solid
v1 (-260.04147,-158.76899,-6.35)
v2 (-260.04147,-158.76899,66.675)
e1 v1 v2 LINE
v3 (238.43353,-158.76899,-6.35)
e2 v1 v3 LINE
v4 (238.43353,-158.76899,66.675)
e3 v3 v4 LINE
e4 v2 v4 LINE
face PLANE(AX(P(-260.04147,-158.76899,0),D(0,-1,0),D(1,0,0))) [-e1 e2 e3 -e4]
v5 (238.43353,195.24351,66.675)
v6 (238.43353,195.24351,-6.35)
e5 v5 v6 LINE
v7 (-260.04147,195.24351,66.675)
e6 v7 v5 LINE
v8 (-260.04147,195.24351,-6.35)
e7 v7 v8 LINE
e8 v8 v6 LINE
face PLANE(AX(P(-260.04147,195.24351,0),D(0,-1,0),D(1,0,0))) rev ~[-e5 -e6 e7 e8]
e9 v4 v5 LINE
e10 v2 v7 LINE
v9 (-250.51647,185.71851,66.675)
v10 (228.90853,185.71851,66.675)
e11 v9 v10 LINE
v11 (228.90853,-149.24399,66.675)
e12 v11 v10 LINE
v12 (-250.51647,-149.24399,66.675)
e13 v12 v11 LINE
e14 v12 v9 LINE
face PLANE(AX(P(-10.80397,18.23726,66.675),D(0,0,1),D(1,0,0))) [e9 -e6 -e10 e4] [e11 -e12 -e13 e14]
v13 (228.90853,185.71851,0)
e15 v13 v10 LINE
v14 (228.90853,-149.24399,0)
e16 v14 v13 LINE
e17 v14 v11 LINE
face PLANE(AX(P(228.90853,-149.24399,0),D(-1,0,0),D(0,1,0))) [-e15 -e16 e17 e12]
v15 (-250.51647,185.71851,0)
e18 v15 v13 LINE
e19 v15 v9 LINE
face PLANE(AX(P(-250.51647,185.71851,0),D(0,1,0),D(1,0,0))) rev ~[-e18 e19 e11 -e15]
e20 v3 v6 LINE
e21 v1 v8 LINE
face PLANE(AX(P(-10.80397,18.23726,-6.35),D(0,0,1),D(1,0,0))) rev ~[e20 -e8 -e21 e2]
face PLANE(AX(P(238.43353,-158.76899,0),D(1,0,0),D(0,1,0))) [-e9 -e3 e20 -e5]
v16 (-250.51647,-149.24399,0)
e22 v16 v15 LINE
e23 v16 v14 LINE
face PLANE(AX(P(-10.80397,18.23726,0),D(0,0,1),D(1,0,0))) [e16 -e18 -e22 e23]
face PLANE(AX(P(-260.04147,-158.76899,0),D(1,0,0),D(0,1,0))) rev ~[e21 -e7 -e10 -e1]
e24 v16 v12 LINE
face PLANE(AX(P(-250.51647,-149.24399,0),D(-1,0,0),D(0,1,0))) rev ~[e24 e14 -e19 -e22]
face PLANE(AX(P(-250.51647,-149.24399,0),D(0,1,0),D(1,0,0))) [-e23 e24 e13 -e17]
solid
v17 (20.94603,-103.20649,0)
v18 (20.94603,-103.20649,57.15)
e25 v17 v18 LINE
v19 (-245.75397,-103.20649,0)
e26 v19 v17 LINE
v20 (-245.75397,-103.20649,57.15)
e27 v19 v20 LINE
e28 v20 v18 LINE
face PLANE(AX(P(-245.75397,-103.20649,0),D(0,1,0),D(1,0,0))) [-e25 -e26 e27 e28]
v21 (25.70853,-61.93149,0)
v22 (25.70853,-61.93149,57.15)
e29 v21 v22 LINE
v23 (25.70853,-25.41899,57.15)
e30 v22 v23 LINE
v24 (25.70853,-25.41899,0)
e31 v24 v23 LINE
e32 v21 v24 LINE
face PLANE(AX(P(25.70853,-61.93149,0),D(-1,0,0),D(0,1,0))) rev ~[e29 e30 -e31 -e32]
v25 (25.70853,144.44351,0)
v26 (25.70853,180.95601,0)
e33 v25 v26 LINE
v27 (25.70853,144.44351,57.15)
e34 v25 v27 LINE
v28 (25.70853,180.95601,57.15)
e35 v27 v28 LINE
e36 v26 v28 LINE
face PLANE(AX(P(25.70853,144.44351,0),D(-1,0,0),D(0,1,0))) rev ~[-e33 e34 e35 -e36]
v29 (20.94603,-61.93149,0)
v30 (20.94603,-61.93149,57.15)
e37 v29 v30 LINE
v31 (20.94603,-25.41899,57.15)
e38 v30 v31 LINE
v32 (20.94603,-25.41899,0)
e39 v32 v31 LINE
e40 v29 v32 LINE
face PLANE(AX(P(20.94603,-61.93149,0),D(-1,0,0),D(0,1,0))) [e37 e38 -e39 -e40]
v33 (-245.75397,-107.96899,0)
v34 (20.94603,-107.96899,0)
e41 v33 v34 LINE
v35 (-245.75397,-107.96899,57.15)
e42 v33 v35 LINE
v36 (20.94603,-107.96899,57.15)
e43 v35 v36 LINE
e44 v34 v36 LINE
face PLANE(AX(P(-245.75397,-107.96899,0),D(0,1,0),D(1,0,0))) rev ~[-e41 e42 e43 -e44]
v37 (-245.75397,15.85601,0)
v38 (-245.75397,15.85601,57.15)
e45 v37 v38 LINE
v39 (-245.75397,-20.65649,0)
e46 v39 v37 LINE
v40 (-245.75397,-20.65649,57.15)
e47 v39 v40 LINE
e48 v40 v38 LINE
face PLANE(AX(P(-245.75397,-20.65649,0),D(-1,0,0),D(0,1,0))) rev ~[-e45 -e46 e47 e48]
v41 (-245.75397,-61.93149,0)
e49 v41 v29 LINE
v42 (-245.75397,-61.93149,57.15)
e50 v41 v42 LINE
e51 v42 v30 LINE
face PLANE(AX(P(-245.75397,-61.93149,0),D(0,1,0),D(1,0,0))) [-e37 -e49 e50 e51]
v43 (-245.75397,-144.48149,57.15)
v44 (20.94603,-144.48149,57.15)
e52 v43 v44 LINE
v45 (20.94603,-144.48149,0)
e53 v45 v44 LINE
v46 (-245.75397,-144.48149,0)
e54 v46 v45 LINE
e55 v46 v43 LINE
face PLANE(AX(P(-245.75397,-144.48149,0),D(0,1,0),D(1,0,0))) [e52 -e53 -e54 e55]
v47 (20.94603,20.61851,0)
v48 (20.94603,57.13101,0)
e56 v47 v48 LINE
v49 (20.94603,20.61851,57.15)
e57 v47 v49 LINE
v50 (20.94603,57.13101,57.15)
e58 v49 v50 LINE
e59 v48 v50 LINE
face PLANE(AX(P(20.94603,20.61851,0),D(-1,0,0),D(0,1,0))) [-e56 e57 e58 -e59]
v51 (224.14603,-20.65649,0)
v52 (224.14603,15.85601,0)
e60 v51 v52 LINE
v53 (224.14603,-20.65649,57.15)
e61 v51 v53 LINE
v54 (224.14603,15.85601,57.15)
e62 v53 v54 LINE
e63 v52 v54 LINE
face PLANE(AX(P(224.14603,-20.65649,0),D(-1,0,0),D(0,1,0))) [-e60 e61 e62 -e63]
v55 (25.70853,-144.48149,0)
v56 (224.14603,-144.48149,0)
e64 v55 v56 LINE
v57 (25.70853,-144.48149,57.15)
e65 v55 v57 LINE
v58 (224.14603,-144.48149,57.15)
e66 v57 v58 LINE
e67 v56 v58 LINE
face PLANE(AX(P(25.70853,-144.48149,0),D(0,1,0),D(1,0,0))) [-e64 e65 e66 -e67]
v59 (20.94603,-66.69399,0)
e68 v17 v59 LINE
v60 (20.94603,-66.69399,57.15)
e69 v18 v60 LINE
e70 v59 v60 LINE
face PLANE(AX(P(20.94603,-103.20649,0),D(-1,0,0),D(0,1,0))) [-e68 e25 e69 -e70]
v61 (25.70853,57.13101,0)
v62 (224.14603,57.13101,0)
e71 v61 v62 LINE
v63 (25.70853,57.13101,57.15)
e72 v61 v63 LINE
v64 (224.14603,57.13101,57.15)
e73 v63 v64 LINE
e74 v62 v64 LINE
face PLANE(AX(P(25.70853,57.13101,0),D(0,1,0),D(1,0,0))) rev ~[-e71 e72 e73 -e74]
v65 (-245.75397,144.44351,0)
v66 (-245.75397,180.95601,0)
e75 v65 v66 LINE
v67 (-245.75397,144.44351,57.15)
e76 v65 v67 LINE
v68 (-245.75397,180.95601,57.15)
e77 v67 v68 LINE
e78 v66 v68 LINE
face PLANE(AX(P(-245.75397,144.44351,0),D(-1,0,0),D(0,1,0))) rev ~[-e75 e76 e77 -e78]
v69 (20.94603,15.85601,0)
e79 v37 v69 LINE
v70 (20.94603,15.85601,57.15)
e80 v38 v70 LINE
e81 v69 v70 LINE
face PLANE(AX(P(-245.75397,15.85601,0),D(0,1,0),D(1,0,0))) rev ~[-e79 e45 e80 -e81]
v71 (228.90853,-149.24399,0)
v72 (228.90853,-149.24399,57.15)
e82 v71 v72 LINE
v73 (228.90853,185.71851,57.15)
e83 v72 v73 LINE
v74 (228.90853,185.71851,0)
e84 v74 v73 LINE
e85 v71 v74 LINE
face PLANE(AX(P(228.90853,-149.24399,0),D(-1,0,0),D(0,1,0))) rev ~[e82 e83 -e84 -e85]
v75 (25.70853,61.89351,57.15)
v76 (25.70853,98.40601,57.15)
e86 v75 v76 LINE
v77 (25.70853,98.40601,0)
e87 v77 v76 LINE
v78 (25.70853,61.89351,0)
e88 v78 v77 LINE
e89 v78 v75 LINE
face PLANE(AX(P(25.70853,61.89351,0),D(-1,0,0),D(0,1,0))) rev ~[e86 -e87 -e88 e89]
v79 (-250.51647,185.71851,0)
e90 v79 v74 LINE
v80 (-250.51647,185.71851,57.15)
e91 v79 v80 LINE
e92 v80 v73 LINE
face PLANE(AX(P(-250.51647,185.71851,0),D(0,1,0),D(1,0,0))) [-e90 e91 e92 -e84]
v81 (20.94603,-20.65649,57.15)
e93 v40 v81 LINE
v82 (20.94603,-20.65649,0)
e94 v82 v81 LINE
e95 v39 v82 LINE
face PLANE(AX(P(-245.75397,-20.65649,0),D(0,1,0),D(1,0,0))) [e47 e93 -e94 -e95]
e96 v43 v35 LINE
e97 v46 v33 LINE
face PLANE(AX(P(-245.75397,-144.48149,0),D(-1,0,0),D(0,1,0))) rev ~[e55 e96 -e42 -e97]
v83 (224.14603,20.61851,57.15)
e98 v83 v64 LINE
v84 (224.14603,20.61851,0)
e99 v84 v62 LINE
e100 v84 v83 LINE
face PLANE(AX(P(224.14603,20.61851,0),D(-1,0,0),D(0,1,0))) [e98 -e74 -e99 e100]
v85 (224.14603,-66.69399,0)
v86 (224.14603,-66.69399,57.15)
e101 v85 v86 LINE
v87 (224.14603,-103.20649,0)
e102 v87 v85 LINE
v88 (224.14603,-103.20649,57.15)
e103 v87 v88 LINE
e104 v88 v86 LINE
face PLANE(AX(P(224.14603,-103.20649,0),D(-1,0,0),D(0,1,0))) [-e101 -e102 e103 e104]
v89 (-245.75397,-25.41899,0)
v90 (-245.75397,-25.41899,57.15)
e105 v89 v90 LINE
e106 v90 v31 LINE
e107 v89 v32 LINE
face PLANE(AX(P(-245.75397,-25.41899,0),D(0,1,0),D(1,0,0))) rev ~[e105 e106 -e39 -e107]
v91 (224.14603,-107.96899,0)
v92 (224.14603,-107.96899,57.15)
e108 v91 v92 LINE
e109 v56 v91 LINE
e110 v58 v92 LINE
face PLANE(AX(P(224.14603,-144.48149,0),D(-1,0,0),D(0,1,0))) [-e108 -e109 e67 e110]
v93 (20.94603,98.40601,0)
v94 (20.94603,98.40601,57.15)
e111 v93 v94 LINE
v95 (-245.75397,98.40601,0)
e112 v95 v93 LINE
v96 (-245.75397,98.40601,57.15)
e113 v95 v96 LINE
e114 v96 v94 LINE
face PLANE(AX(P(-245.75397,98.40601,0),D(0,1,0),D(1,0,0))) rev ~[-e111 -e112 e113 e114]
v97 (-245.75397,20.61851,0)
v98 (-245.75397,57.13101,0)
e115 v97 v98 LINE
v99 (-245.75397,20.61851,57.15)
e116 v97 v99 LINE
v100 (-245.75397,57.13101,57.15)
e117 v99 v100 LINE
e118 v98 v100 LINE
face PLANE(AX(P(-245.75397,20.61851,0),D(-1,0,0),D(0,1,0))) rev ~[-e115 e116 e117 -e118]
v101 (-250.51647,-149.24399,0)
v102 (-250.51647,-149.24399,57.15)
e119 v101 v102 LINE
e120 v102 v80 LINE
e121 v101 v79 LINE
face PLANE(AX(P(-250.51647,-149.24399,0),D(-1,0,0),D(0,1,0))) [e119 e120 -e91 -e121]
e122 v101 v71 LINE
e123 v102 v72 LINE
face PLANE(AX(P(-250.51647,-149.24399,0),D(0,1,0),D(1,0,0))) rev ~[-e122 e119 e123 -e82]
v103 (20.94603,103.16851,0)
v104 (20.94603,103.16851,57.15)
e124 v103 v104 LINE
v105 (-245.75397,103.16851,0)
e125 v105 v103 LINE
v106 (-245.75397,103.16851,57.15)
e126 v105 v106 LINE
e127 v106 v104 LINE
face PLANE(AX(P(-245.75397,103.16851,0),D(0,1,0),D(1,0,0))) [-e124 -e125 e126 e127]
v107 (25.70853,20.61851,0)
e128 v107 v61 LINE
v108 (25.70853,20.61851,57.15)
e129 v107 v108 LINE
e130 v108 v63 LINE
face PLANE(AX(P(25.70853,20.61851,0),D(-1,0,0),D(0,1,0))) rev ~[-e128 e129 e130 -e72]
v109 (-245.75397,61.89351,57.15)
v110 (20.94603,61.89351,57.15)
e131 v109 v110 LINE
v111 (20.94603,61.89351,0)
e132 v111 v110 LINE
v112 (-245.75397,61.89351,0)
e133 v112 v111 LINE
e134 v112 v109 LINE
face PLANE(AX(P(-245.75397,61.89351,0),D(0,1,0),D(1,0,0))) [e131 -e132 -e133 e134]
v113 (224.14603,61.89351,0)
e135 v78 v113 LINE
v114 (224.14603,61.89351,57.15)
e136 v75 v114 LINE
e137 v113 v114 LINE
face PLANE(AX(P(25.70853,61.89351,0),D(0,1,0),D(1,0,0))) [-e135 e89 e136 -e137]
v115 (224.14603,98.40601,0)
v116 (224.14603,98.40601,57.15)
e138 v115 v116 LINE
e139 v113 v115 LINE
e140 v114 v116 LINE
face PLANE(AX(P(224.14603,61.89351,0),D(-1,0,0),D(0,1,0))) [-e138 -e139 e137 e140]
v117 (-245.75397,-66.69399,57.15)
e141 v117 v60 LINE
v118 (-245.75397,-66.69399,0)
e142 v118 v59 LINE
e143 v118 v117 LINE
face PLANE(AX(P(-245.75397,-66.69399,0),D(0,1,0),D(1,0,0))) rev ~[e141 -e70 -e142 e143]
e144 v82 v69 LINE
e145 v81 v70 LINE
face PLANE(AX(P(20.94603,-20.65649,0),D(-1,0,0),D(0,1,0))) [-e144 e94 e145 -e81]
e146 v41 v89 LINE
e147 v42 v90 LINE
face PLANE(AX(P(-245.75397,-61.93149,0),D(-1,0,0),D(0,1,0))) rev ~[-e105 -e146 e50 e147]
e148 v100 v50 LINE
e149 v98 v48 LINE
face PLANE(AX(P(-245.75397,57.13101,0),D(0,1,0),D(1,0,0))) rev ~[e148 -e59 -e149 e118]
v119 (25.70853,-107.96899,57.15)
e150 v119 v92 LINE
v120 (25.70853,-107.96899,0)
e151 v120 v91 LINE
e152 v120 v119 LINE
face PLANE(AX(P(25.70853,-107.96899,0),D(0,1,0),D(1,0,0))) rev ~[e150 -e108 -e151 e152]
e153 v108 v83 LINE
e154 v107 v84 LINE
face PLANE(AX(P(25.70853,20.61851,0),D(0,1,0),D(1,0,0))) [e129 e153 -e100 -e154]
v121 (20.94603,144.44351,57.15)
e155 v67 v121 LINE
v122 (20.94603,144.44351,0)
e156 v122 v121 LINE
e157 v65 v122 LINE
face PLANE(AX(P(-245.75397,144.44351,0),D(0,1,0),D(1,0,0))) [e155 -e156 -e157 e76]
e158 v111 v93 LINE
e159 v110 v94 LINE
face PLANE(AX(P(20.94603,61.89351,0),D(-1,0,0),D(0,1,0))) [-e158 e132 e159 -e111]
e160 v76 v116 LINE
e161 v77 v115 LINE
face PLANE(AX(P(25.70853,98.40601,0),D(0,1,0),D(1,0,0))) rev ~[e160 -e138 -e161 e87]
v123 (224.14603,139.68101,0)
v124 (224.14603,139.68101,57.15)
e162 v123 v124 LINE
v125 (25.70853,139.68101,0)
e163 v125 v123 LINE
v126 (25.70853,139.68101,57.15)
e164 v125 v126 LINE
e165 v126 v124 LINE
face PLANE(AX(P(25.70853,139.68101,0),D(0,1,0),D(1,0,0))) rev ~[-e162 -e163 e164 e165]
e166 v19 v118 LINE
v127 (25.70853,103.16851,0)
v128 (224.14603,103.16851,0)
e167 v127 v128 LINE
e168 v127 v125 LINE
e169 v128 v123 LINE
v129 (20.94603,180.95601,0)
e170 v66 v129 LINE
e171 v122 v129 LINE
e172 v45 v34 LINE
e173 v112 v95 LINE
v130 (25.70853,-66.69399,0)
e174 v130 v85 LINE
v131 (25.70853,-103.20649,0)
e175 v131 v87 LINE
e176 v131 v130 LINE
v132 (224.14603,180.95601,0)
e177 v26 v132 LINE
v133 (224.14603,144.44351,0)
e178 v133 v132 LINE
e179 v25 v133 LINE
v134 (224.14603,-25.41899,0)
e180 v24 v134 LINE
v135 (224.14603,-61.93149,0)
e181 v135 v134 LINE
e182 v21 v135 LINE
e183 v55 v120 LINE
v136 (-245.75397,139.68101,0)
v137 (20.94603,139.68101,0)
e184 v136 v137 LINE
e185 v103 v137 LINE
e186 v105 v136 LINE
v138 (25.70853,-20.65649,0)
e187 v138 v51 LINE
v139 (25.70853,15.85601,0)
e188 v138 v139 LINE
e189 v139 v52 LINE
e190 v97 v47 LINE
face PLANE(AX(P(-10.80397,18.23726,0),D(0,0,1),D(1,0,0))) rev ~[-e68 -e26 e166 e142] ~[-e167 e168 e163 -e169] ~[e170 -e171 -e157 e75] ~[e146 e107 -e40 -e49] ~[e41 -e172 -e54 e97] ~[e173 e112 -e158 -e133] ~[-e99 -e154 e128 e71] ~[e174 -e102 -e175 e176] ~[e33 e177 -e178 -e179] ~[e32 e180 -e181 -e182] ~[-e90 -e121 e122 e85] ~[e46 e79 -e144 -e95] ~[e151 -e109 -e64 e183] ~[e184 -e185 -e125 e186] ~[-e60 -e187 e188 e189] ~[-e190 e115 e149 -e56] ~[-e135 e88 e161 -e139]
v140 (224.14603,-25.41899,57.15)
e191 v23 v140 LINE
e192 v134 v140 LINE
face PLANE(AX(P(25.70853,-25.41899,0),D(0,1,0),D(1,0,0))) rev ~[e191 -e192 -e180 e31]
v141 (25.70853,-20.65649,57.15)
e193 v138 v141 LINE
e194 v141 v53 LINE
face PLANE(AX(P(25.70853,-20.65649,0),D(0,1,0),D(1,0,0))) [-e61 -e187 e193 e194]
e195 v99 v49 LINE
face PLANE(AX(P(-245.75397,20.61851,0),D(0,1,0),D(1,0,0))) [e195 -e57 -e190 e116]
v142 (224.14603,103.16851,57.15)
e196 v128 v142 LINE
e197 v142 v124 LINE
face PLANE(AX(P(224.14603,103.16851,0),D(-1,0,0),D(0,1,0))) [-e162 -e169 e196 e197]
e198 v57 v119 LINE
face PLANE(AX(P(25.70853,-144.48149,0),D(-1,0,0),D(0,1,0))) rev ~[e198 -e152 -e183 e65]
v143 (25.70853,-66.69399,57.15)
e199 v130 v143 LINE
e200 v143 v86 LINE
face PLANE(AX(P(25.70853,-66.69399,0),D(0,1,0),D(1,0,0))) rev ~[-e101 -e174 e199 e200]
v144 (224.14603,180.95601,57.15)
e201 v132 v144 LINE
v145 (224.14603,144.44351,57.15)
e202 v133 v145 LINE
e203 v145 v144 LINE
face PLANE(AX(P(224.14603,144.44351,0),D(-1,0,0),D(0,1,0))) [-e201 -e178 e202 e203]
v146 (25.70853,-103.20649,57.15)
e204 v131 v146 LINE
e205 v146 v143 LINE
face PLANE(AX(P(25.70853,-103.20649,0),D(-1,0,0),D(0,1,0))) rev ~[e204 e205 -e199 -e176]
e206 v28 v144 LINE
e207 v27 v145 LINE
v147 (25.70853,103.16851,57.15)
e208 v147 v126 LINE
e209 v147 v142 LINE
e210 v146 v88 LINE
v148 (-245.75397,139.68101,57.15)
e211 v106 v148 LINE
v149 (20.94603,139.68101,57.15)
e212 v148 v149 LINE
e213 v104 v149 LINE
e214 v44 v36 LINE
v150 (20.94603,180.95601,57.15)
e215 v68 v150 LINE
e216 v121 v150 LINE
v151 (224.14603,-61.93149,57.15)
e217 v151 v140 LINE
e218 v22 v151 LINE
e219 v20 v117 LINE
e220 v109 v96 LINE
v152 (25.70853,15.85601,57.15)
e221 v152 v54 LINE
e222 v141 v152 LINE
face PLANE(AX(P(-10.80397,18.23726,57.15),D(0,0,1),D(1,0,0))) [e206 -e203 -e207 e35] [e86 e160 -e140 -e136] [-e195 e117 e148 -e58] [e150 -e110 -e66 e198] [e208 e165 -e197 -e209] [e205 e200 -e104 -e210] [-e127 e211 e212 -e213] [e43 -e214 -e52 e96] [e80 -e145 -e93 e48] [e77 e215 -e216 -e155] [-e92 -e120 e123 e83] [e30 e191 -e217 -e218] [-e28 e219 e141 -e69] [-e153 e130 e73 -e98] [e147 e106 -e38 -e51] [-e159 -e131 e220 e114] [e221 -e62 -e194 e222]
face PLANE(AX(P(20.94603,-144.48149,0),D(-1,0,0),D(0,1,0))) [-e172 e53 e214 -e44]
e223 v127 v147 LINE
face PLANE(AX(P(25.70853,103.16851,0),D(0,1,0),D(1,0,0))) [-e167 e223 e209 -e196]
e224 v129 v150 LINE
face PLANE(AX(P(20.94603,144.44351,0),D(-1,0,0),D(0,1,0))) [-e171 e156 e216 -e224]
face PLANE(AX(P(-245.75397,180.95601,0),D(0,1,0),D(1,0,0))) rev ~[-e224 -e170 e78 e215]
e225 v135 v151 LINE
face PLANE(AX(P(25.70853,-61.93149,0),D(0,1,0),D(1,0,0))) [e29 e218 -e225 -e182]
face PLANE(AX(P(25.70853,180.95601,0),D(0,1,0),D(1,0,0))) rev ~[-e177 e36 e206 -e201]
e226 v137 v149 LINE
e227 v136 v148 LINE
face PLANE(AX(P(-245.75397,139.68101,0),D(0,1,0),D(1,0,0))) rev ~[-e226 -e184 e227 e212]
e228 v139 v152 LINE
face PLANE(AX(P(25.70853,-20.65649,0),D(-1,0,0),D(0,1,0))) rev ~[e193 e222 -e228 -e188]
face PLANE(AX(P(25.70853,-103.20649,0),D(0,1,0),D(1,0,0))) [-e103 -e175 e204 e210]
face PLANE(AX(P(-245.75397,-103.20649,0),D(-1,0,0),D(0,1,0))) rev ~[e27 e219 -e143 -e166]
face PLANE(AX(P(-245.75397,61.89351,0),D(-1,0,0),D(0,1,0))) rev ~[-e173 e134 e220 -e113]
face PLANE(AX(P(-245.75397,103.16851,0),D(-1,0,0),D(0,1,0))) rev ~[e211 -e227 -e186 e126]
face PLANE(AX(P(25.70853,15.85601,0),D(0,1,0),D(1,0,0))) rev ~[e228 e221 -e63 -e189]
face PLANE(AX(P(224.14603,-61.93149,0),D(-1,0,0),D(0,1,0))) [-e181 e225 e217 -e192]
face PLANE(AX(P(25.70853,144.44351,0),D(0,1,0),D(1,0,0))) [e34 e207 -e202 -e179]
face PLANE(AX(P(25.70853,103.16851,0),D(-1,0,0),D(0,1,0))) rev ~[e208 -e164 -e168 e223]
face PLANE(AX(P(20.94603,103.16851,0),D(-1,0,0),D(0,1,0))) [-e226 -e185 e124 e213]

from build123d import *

# Parameters (mm, degrees)
F0_W     = 498.475
F0_H     = 354.0125
F0_W_2   = 479.425
F0_H_2   = 334.9625
F1_DEPTH = 66.675
F0_W_3   = 266.7
F0_H_3   = 36.5125
F0_W_4   = 198.4375
F2_DEPTH = 57.15
F3_W     = 498.475
F3_H     = 354.0125
F4_DEPTH = 6.35


with BuildPart() as f1:
    # F0 (on Top) → F1 (new body)
    with BuildSketch(Plane.XY):
        with Locations((-10.8039700516, 18.2372602986)):
            Rectangle(F0_W, F0_H)
        with Locations((-10.8039700516, 18.2372602986)):
            Rectangle(F0_W_2, F0_H_2, mode=Mode.SUBTRACT)
    extrude(amount=F1_DEPTH)

    # F3 (on face) → F4 (join)
    with BuildSketch(Plane.XY):
        with Locations((-10.8039700516, 18.2372602986)):
            Rectangle(F3_W, F3_H)
    extrude(amount=-F4_DEPTH)


with BuildPart() as f2:
    # F0 (on Top) → F2 (new body)
    with BuildSketch(Plane.XY):
        with Locations((-10.8039700516, 18.2372602986)):
            Rectangle(F0_W_2, F0_H_2)
        with Locations((-112.4039700516, -126.2252397014)):
            Rectangle(F0_W_3, F0_H_3, mode=Mode.SUBTRACT)
        with Locations((-112.4039700516, -84.9502397014)):
            Rectangle(F0_W_3, F0_H_3, mode=Mode.SUBTRACT)
        with Locations((-112.4039700516, -43.6752397014)):
            Rectangle(F0_W_3, F0_H_3, mode=Mode.SUBTRACT)
        with Locations((-112.4039700516, -2.4002397014)):
            Rectangle(F0_W_3, F0_H_3, mode=Mode.SUBTRACT)
        with Locations((124.9272799484, -126.2252397014)):
            Rectangle(F0_W_4, F0_H_3, mode=Mode.SUBTRACT)
        with Locations((124.9272799484, -84.9502397014)):
            Rectangle(F0_W_4, F0_H_3, mode=Mode.SUBTRACT)
        with Locations((124.9272799484, -43.6752397014)):
            Rectangle(F0_W_4, F0_H_3, mode=Mode.SUBTRACT)
        with Locations((124.9272799484, -2.4002397014)):
            Rectangle(F0_W_4, F0_H_3, mode=Mode.SUBTRACT)
        with Locations((-112.4039700516, 38.8747602986)):
            Rectangle(F0_W_3, F0_H_3, mode=Mode.SUBTRACT)
        with Locations((-112.4039700516, 80.1497602986)):
            Rectangle(F0_W_3, F0_H_3, mode=Mode.SUBTRACT)
        with Locations((-112.4039700516, 121.4247602986)):
            Rectangle(F0_W_3, F0_H_3, mode=Mode.SUBTRACT)
        with Locations((-112.4039700516, 162.6997602986)):
            Rectangle(F0_W_3, F0_H_3, mode=Mode.SUBTRACT)
        with Locations((124.9272799484, 38.8747602986)):
            Rectangle(F0_W_4, F0_H_3, mode=Mode.SUBTRACT)
        with Locations((124.9272799484, 80.1497602986)):
            Rectangle(F0_W_4, F0_H_3, mode=Mode.SUBTRACT)
        with Locations((124.9272799484, 121.4247602986)):
            Rectangle(F0_W_4, F0_H_3, mode=Mode.SUBTRACT)
        with Locations((124.9272799484, 162.6997602986)):
            Rectangle(F0_W_4, F0_H_3, mode=Mode.SUBTRACT)
    extrude(amount=F2_DEPTH)


solid = Compound([f1.part, f2.part])
